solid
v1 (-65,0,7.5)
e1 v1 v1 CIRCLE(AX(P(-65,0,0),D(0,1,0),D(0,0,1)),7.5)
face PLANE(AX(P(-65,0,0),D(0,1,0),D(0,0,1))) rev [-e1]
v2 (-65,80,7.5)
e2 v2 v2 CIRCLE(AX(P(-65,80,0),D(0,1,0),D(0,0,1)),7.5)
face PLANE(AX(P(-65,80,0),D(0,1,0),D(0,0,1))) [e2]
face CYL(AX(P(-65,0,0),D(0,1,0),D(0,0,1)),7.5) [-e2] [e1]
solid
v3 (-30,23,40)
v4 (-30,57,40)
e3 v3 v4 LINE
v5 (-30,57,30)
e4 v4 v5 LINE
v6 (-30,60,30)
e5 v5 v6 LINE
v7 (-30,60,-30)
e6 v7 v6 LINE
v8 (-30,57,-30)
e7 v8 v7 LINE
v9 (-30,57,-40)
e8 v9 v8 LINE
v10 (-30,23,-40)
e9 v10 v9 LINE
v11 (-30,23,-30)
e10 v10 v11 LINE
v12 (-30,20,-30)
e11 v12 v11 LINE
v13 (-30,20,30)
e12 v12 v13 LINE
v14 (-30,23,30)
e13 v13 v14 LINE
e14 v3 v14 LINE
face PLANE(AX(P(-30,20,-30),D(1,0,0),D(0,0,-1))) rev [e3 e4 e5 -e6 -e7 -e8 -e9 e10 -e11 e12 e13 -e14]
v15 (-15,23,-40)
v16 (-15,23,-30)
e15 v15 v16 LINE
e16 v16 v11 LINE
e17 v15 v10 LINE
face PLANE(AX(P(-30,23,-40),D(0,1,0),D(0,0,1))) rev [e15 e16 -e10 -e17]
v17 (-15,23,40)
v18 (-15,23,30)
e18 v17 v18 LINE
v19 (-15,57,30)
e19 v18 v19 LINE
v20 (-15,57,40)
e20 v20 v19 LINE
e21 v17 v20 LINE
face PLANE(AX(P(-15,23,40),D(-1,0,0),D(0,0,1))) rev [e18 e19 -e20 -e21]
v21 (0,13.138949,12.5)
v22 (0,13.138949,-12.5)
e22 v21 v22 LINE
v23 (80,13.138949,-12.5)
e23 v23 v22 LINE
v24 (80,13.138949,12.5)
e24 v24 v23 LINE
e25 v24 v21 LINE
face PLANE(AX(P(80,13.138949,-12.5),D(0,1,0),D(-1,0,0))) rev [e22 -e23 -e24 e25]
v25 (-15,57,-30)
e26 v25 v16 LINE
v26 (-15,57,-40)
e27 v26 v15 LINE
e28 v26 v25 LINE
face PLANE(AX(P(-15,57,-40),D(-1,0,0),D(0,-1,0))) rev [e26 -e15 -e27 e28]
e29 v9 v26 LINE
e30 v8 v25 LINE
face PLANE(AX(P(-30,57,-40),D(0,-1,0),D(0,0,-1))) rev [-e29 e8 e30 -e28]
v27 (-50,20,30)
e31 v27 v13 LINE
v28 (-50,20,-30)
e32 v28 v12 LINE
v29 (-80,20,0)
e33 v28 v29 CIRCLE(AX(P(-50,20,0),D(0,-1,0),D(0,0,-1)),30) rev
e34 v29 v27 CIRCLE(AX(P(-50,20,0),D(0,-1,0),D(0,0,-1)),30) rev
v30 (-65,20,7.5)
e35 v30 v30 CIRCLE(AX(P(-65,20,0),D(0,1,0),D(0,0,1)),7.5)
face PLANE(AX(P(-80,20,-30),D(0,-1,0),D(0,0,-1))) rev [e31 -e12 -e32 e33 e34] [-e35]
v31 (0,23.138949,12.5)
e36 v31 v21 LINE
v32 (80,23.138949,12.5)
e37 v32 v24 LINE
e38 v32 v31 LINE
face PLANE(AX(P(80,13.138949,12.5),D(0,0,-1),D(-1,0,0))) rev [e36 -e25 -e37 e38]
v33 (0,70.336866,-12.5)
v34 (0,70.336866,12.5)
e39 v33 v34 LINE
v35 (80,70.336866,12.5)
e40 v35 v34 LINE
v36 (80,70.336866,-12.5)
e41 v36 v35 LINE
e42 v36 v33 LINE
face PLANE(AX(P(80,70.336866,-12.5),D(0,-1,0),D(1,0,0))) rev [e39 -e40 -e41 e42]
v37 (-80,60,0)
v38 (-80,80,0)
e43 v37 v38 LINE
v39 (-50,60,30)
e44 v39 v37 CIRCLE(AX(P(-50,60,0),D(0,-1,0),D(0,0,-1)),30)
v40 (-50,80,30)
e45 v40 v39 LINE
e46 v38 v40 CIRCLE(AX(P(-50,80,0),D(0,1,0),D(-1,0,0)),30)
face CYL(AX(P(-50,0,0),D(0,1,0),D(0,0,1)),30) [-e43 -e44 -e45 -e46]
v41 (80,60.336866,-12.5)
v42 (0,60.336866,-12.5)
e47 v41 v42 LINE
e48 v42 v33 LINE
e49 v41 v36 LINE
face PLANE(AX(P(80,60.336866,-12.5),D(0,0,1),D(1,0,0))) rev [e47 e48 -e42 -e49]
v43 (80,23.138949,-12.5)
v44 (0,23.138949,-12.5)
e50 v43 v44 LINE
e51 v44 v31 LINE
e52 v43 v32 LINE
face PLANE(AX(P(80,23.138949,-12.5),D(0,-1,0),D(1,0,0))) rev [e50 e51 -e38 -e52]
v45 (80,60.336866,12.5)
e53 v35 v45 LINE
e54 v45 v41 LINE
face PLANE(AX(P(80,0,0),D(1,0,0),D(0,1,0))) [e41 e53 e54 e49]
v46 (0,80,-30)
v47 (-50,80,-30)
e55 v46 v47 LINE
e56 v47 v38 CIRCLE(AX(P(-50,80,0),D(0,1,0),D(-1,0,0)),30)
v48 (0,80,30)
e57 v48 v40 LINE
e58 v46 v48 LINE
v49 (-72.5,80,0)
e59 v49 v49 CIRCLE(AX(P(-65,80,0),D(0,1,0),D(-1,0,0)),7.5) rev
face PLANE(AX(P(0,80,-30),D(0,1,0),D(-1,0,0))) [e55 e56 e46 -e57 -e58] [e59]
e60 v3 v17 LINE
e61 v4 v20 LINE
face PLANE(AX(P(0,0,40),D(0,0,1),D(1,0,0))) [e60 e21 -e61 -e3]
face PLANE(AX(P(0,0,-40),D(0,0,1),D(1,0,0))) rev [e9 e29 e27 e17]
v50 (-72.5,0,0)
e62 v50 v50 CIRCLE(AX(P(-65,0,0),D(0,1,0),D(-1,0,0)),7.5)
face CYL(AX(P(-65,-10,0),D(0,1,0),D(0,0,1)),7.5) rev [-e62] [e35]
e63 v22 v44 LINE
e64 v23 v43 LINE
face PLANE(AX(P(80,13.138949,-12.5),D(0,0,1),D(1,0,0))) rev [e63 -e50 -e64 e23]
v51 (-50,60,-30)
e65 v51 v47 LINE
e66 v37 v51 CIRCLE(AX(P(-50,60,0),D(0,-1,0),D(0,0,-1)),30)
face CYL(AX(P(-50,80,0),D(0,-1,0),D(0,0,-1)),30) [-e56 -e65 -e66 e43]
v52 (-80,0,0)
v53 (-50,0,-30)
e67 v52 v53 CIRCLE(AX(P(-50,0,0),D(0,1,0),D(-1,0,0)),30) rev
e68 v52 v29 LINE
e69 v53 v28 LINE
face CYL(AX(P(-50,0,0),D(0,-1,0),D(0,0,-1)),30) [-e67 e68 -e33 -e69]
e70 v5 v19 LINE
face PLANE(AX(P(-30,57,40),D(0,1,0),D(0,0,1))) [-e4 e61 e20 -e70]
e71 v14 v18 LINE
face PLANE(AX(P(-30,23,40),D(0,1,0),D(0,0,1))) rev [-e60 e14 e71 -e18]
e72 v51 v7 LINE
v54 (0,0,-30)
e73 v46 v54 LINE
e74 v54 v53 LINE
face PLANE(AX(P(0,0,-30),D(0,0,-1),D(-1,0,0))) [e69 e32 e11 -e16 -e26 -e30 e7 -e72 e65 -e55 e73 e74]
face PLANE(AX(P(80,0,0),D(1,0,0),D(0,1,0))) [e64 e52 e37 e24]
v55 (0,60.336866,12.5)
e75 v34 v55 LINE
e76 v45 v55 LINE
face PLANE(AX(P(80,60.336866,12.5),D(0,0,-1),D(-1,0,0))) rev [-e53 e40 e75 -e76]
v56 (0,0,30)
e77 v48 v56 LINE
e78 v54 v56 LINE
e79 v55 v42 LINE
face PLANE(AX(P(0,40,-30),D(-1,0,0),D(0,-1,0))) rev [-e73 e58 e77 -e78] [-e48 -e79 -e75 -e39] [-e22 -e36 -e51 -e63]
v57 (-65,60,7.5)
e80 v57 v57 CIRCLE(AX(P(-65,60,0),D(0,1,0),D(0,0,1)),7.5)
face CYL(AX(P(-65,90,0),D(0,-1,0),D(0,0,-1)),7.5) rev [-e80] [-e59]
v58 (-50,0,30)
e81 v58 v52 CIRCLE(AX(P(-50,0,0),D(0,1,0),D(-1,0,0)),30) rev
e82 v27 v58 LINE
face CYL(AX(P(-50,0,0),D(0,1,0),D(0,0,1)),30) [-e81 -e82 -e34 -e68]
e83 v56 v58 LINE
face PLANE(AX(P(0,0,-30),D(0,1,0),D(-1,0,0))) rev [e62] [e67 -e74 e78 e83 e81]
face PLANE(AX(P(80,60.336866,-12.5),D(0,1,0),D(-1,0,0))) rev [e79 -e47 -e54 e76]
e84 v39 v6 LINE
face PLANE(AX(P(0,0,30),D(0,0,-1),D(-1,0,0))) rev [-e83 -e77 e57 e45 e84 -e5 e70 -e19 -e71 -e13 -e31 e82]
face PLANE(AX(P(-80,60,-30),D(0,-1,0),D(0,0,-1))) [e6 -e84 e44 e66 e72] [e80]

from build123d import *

# Parameters (mm, degrees)
BOSS_EXTRUDE1_DEPTH      = 30
SKETCH3_R                = 7.5
CUT_EXTRUDE1_DEPTH       = 30
FILLET1_R                = 30
FILLET2_R                = 30
MIRROR3_START            = 60
MIRROR3_OUTLINE_R        = 7.5
MIRROR3_DEPTH            = 20
MIRROR3_START_2          = 40
MIRROR3_2_OUTLINE_W      = 30
MIRROR3_2_OUTLINE_H      = 60
MIRROR3_2_DEPTH          = 20
SKETCH5_W                = 25
SKETCH5_H                = 10
BOSS_EXTRUDE3_DEPTH      = 80
SKETCH6_W                = 15
SKETCH6_H                = 34
BOSS_EXTRUDE4_DEPTH      = 10
SKETCH8_W                = 15
SKETCH8_H                = 34
BOSS_EXTRUDE5_DEPTH      = 10
BOSS_EXTRUDE6_DEPTH      = 60
BOSS_EXTRUDE6_DEPTH_BACK = 20
SKETCH9_R                = 7.5


# Read off the part's stored shape, not the designer's step: Mirror3
with BuildPart() as part:
    # Sketch1 → Boss-Extrude1 (new, symmetric)
    with BuildSketch(Plane.XY):
        Polygon((-80, 0), (-80, 20), (-30, 20), (-30, 40), (0, 40), (0, 0), align=None)
    extrude(amount=BOSS_EXTRUDE1_DEPTH, both=True)

    # Sketch3 → Cut-Extrude1 (cut)
    with BuildSketch(Plane(origin=(0, 20, 0), x_dir=(1, 0, 0), z_dir=(0, 1, 0))):
        with Locations(Location((-65, 0, 0), (0, 0, 270))):
            Circle(SKETCH3_R)
    extrude(amount=-CUT_EXTRUDE1_DEPTH, mode=Mode.SUBTRACT)

    # Fillet1
    fillet1_edges = [part.edges().sort_by_distance(p)[0] for p in [
        (-80, 10, 30),
    ]]
    fillet(fillet1_edges, radius=FILLET1_R)

    # Fillet2
    fillet2_edges = [part.edges().sort_by_distance(p)[0] for p in [
        (-80, 10, -30),
    ]]
    fillet(fillet2_edges, radius=FILLET2_R - 0.0001)  # a hair under: the kernel refuses the full size



with BuildPart() as body_2:
    # Mirror3 outline → Mirror3 (new body)
    with BuildSketch(Plane(origin=(0, 0, 0), x_dir=(1, 0, 0), z_dir=(0, 1, 0)).offset(MIRROR3_START)):
        with BuildLine():
            Line((0, -30), (0, 30))
            Line((0, 30), (-50, 30))
            ThreePointArc((-50, 30), (-71.213203436, 21.213203436), (-80, 0))
            ThreePointArc((-80, 0), (-71.213203436, -21.213203436), (-50, -30))
            Line((-50, -30), (0, -30))
        make_face()
        with Locations((-65, 0)):
            Circle(MIRROR3_OUTLINE_R, mode=Mode.SUBTRACT)
    extrude(amount=MIRROR3_DEPTH)


with BuildPart() as part_1:
    add(part.part)

    add(body_2.part)  # Mirror3 2 merges body 2
    # Mirror3 2 outline → Mirror3 2 (add)
    with BuildSketch(Plane(origin=(0, 0, 0), x_dir=(1, 0, 0), z_dir=(0, 1, 0)).offset(MIRROR3_START_2)):
        with Locations((-15, 0)):
            Rectangle(MIRROR3_2_OUTLINE_W, MIRROR3_2_OUTLINE_H)
    extrude(amount=MIRROR3_2_DEPTH)

    # Sketch5 → Boss-Extrude3 (add)
    with BuildSketch(Plane(origin=(0, 0, 0), x_dir=(0, 0, -1), z_dir=(1, 0, 0))):
        with Locations((0, 65.336865941)):
            Rectangle(SKETCH5_W, SKETCH5_H)
        with Locations((0, 18.138949218)):
            Rectangle(SKETCH5_W, SKETCH5_H)
    extrude(amount=BOSS_EXTRUDE3_DEPTH)

    # Sketch6 → Boss-Extrude4 (add)
    with BuildSketch(Plane.XY.offset(30)):
        with Locations((-22.5, 40)):
            Rectangle(SKETCH6_W, SKETCH6_H)
    extrude(amount=BOSS_EXTRUDE4_DEPTH)

    # Sketch8 → Boss-Extrude5 (add)
    with BuildSketch(Plane(origin=(0, 0, -30), x_dir=(-1, 0, 0), z_dir=(0, 0, -1))):
        with Locations((22.5, 40)):
            Rectangle(SKETCH8_W, SKETCH8_H)
    extrude(amount=BOSS_EXTRUDE5_DEPTH)


with BuildPart() as body_2_2:
    # Sketch9 → Boss-Extrude6 (new, two sides: drawn at the far end of the back side and taken through both)
    with BuildSketch(Plane(origin=(0, 20, 0), x_dir=(1, 0, 0), z_dir=(0, 1, 0)).offset(-BOSS_EXTRUDE6_DEPTH_BACK)):
        with Locations(Location((-65, 0, 0), (0, 0, 270))):
            Circle(SKETCH9_R)
    extrude(amount=BOSS_EXTRUDE6_DEPTH + BOSS_EXTRUDE6_DEPTH_BACK)


solid = Compound([part_1.part, body_2_2.part])
